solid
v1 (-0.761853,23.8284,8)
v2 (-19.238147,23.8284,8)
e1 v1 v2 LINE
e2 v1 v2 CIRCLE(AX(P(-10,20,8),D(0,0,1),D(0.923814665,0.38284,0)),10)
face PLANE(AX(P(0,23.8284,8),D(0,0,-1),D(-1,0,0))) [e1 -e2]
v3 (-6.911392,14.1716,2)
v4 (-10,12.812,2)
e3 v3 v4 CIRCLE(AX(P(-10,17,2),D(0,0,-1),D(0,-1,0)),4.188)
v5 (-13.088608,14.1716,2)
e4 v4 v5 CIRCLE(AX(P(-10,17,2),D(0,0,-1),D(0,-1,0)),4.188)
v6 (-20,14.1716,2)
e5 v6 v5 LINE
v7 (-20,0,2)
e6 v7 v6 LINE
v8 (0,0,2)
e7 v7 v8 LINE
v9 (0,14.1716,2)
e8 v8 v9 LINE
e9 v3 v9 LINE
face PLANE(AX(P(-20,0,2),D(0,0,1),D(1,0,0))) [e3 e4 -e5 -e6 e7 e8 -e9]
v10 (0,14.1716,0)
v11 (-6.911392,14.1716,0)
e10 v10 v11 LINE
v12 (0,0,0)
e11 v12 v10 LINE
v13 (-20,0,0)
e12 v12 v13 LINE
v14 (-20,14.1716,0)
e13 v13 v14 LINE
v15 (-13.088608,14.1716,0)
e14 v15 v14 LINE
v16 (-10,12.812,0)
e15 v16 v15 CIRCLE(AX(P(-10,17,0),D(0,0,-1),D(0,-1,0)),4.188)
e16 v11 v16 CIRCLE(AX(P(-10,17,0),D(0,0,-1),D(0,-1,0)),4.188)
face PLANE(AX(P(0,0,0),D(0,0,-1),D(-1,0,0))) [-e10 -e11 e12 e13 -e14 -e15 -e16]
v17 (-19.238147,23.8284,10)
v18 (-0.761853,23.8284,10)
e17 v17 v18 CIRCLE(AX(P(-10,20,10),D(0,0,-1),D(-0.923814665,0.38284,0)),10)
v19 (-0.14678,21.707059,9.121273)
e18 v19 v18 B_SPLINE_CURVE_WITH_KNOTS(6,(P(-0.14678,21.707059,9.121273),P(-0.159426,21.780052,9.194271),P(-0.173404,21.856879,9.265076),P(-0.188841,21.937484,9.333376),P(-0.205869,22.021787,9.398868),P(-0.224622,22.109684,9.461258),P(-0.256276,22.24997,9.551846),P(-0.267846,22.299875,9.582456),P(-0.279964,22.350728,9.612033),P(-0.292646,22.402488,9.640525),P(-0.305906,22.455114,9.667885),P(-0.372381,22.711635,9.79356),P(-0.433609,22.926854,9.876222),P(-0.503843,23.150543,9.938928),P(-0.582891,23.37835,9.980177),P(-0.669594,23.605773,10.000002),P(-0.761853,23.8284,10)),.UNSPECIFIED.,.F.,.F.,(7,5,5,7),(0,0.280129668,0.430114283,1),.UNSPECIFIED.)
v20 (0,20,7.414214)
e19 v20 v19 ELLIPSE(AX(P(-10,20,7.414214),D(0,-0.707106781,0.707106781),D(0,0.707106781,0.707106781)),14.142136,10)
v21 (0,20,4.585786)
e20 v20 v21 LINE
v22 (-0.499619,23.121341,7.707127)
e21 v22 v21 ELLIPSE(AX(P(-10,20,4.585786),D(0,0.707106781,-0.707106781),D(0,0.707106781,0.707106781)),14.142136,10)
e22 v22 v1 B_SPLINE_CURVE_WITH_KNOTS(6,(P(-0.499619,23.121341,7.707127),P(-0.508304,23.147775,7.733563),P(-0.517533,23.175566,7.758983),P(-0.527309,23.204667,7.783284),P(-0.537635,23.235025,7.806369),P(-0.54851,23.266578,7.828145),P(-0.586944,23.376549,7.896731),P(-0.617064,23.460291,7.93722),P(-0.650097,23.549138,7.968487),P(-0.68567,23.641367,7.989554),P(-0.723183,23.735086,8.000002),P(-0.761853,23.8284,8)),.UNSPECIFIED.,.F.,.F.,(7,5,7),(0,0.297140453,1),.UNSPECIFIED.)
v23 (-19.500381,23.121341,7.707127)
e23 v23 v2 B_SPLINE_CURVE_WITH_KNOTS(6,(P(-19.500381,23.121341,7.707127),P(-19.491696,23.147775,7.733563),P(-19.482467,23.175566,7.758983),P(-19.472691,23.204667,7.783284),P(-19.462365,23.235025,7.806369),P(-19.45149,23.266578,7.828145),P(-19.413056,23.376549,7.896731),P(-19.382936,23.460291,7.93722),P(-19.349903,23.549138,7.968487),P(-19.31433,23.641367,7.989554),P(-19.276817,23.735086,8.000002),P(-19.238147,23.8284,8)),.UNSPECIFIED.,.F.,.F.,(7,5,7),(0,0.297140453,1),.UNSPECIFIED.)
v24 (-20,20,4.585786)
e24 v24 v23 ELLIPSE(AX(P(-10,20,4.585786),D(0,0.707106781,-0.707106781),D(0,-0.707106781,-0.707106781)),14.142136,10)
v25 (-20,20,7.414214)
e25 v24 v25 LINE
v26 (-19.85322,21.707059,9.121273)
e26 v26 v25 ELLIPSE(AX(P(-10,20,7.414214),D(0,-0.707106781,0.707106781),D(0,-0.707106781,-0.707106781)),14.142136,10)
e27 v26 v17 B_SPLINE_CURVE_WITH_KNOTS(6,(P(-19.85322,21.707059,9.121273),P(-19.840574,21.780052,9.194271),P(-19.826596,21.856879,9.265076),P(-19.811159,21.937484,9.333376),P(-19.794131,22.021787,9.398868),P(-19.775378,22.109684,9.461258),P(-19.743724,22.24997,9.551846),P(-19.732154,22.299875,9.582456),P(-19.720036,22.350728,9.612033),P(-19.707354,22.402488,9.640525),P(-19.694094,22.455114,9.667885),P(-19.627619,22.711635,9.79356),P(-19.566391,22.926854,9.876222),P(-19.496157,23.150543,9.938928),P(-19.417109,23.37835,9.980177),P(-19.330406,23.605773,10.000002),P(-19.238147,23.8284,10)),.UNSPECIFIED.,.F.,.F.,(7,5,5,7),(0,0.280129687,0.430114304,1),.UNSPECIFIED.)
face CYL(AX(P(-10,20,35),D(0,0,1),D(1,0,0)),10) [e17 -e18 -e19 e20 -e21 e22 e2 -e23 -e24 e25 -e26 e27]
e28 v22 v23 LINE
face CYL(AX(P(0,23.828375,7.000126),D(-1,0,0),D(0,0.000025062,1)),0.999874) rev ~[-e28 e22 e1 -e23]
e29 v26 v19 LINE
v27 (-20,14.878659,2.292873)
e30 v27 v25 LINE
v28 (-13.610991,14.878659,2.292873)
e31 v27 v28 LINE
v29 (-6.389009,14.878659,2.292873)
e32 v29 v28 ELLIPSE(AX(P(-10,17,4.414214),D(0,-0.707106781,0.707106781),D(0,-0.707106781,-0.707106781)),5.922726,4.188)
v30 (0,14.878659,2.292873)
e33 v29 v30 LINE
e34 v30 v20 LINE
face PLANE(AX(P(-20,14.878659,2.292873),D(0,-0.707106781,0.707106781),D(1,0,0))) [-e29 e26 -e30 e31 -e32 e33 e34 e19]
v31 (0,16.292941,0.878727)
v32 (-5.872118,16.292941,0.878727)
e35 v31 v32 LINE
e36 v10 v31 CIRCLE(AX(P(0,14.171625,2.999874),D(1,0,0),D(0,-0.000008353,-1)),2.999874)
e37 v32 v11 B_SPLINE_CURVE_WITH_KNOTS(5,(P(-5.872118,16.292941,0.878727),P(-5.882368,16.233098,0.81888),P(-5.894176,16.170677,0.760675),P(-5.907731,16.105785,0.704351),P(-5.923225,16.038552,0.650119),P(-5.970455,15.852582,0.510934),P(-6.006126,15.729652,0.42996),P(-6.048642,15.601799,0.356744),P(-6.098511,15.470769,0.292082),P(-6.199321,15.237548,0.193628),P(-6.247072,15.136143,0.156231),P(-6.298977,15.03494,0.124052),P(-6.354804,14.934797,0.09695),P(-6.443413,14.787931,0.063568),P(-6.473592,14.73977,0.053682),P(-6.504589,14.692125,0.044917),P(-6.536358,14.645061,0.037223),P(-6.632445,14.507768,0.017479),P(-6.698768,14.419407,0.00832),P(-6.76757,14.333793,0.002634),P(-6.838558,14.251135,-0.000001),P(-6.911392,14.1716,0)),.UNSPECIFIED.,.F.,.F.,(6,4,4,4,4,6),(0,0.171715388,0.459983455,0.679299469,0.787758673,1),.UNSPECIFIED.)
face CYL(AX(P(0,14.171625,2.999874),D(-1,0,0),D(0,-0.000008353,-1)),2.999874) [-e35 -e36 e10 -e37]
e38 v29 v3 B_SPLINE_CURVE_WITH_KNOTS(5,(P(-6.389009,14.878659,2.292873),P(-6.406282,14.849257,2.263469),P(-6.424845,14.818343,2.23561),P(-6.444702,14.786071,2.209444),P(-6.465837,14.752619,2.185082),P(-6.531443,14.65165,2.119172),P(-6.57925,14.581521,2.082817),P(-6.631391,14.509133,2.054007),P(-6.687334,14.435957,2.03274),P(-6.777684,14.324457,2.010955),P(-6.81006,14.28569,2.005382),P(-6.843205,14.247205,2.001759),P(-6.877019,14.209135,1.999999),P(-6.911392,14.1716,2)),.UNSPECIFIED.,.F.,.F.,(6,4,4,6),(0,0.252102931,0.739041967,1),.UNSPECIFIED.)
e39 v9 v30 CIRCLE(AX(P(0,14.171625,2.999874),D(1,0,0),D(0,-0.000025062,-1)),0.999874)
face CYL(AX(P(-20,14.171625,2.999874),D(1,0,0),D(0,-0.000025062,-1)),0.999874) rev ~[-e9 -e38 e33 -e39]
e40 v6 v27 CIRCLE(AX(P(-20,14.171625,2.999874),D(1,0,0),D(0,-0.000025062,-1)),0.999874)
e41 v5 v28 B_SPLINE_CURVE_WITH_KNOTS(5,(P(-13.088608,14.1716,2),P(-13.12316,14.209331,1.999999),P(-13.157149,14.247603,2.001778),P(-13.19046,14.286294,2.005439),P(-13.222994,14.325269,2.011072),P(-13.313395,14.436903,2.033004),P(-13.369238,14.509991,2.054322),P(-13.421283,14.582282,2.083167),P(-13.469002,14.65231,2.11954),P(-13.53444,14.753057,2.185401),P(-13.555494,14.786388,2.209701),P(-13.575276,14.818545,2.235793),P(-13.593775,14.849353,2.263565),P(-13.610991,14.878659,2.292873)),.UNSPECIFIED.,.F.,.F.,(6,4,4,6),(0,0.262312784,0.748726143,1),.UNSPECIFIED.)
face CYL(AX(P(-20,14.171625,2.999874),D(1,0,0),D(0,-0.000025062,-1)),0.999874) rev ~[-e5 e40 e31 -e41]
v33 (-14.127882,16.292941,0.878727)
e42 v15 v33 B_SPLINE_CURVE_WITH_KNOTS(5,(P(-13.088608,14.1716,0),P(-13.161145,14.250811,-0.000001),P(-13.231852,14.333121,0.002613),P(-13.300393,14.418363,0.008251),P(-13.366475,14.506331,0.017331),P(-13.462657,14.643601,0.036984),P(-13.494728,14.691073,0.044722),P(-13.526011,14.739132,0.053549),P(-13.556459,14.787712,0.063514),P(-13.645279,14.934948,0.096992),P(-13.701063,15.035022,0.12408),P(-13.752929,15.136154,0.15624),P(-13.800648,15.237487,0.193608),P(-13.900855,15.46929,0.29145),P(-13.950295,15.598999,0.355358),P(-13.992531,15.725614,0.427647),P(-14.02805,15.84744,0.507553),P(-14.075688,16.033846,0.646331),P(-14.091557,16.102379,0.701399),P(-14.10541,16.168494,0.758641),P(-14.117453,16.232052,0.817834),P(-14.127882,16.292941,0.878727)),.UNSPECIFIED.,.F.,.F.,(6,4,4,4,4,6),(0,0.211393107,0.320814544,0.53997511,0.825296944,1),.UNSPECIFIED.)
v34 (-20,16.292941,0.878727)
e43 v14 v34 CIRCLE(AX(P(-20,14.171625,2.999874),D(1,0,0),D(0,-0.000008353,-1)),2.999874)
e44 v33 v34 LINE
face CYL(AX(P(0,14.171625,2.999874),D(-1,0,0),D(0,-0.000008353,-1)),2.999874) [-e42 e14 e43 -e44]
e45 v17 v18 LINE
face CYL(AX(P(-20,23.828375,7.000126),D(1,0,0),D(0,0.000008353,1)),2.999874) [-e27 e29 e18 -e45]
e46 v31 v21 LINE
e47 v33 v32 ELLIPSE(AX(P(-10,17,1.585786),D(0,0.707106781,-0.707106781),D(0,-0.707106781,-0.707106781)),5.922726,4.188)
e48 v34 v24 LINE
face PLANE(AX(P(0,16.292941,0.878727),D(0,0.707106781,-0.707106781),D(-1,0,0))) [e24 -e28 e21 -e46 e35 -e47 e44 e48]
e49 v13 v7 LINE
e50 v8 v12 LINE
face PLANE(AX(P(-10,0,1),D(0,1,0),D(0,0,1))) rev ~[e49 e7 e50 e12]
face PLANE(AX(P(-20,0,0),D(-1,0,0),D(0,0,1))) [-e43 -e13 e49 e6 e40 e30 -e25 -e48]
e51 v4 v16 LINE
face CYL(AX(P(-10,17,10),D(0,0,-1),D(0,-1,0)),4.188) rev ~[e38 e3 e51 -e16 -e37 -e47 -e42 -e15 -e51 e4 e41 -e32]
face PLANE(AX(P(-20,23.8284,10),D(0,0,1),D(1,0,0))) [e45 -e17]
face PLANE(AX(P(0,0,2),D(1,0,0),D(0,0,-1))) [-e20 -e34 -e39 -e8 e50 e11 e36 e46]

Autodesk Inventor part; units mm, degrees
ref_plane "YZ Plane" through (0, 0, 0) normal (1, 0, 0) x (0, 1, 0)
ref_plane "XZ Plane" through (0, 0, 0) normal (0, 1, 0) x (-1, 0, 0)
ref_plane "XY Plane" through (0, 0, 0) normal (0, 0, 1) x (1, 0, 0)
sketch "Szkic1" plane through (0, 0, 0) normal (0, 1, 0) x (-1, 0, 0)
  line L0 (0, 0) -> (20, 0)
  line L1 (20, 0) -> (20, 2)
  line L2 (20, 2) -> (0, 2)
  line L3 (0, 2) -> (0, 0)
  dimension "d20" = 20
  dimension "d21" = 2
sketch "Szkic5" plane through (0, 0, 0) normal (1, 0, 0) x (0, 1, 0)
  line L0 (0, 2) -> (0, 0) construction
  line L1 (0, 1) -> (14.1716, 1)
  line L2 (15.5858, 1.5858) -> (22.4142, 8.4142)
  line L3 (23.8284, 9) -> (30, 9)
  arc A0 (14.1716, 1) -> (15.5858, 1.5858) centre (14.1716, 3) ccw
  arc A1 (23.8284, 9) -> (22.4142, 8.4142) centre (23.8284, 7) ccw
  point P0 (15, 1)
  point P1 (23, 9)
  dimension "d22" = 15
  dimension "d23" = 8
  dimension "d24" = 30
  dimension "d25" = 45
  dimension "d27" = 2
sweep "Przeciągnięcie1" add profiles "Szkic1" path "Szkic5"
fillet "Zaokrąglenie1" radius 10 2 edges at (-20, 30, 9) (0, 30, 9)
sketch "Szkic2" plane through (-20, 23.8284, 10) normal (0, 0, 1) x (1, 0, 0)
  arc A0 (19.2381, 0) -> (0.7619, 0) centre (10, -3.8284) ccw projected
  point P0 (20, 26.1716)
  point P1 (0, 26.1716)
  point P2 (10, -6.8284)
  dimension "d29" = 3
hole "Otwór1" at (-10, 17, 10) direction (0, 0, -1) diameter 8.376 end through all
pattern_linear "Szyk prostokątny2" [suppressed]
equation "\"d12\" = Grubość"
equation "\"PromieńGięcia\" = Grubość"
equation "\"SzerokośćGięciaPodcięcia\" = Grubość"
equation "\"GłębokośćGięciaPodcięcia\" = 0.5 * Grubość"
equation "\"RozmiarPodcięciaNarożnika\" = 4 * Grubość"
equation "\"MinimalnaPozostałość\" = 2 * Grubość"
equation "\"PromieńPrzejścia\" = PromieńGięcia"
equation "\"Rozmiar_promienia_Jacobiego\" = Grubość"
equation "\"Wielk_odstępu\" = Grubość"
equation "\"d5\" = PromieńGięcia"
equation "\"Grubość\" = 2"
properties part number "Blaszka_do_ciągu" material "Aluminium 6061-AHC"
